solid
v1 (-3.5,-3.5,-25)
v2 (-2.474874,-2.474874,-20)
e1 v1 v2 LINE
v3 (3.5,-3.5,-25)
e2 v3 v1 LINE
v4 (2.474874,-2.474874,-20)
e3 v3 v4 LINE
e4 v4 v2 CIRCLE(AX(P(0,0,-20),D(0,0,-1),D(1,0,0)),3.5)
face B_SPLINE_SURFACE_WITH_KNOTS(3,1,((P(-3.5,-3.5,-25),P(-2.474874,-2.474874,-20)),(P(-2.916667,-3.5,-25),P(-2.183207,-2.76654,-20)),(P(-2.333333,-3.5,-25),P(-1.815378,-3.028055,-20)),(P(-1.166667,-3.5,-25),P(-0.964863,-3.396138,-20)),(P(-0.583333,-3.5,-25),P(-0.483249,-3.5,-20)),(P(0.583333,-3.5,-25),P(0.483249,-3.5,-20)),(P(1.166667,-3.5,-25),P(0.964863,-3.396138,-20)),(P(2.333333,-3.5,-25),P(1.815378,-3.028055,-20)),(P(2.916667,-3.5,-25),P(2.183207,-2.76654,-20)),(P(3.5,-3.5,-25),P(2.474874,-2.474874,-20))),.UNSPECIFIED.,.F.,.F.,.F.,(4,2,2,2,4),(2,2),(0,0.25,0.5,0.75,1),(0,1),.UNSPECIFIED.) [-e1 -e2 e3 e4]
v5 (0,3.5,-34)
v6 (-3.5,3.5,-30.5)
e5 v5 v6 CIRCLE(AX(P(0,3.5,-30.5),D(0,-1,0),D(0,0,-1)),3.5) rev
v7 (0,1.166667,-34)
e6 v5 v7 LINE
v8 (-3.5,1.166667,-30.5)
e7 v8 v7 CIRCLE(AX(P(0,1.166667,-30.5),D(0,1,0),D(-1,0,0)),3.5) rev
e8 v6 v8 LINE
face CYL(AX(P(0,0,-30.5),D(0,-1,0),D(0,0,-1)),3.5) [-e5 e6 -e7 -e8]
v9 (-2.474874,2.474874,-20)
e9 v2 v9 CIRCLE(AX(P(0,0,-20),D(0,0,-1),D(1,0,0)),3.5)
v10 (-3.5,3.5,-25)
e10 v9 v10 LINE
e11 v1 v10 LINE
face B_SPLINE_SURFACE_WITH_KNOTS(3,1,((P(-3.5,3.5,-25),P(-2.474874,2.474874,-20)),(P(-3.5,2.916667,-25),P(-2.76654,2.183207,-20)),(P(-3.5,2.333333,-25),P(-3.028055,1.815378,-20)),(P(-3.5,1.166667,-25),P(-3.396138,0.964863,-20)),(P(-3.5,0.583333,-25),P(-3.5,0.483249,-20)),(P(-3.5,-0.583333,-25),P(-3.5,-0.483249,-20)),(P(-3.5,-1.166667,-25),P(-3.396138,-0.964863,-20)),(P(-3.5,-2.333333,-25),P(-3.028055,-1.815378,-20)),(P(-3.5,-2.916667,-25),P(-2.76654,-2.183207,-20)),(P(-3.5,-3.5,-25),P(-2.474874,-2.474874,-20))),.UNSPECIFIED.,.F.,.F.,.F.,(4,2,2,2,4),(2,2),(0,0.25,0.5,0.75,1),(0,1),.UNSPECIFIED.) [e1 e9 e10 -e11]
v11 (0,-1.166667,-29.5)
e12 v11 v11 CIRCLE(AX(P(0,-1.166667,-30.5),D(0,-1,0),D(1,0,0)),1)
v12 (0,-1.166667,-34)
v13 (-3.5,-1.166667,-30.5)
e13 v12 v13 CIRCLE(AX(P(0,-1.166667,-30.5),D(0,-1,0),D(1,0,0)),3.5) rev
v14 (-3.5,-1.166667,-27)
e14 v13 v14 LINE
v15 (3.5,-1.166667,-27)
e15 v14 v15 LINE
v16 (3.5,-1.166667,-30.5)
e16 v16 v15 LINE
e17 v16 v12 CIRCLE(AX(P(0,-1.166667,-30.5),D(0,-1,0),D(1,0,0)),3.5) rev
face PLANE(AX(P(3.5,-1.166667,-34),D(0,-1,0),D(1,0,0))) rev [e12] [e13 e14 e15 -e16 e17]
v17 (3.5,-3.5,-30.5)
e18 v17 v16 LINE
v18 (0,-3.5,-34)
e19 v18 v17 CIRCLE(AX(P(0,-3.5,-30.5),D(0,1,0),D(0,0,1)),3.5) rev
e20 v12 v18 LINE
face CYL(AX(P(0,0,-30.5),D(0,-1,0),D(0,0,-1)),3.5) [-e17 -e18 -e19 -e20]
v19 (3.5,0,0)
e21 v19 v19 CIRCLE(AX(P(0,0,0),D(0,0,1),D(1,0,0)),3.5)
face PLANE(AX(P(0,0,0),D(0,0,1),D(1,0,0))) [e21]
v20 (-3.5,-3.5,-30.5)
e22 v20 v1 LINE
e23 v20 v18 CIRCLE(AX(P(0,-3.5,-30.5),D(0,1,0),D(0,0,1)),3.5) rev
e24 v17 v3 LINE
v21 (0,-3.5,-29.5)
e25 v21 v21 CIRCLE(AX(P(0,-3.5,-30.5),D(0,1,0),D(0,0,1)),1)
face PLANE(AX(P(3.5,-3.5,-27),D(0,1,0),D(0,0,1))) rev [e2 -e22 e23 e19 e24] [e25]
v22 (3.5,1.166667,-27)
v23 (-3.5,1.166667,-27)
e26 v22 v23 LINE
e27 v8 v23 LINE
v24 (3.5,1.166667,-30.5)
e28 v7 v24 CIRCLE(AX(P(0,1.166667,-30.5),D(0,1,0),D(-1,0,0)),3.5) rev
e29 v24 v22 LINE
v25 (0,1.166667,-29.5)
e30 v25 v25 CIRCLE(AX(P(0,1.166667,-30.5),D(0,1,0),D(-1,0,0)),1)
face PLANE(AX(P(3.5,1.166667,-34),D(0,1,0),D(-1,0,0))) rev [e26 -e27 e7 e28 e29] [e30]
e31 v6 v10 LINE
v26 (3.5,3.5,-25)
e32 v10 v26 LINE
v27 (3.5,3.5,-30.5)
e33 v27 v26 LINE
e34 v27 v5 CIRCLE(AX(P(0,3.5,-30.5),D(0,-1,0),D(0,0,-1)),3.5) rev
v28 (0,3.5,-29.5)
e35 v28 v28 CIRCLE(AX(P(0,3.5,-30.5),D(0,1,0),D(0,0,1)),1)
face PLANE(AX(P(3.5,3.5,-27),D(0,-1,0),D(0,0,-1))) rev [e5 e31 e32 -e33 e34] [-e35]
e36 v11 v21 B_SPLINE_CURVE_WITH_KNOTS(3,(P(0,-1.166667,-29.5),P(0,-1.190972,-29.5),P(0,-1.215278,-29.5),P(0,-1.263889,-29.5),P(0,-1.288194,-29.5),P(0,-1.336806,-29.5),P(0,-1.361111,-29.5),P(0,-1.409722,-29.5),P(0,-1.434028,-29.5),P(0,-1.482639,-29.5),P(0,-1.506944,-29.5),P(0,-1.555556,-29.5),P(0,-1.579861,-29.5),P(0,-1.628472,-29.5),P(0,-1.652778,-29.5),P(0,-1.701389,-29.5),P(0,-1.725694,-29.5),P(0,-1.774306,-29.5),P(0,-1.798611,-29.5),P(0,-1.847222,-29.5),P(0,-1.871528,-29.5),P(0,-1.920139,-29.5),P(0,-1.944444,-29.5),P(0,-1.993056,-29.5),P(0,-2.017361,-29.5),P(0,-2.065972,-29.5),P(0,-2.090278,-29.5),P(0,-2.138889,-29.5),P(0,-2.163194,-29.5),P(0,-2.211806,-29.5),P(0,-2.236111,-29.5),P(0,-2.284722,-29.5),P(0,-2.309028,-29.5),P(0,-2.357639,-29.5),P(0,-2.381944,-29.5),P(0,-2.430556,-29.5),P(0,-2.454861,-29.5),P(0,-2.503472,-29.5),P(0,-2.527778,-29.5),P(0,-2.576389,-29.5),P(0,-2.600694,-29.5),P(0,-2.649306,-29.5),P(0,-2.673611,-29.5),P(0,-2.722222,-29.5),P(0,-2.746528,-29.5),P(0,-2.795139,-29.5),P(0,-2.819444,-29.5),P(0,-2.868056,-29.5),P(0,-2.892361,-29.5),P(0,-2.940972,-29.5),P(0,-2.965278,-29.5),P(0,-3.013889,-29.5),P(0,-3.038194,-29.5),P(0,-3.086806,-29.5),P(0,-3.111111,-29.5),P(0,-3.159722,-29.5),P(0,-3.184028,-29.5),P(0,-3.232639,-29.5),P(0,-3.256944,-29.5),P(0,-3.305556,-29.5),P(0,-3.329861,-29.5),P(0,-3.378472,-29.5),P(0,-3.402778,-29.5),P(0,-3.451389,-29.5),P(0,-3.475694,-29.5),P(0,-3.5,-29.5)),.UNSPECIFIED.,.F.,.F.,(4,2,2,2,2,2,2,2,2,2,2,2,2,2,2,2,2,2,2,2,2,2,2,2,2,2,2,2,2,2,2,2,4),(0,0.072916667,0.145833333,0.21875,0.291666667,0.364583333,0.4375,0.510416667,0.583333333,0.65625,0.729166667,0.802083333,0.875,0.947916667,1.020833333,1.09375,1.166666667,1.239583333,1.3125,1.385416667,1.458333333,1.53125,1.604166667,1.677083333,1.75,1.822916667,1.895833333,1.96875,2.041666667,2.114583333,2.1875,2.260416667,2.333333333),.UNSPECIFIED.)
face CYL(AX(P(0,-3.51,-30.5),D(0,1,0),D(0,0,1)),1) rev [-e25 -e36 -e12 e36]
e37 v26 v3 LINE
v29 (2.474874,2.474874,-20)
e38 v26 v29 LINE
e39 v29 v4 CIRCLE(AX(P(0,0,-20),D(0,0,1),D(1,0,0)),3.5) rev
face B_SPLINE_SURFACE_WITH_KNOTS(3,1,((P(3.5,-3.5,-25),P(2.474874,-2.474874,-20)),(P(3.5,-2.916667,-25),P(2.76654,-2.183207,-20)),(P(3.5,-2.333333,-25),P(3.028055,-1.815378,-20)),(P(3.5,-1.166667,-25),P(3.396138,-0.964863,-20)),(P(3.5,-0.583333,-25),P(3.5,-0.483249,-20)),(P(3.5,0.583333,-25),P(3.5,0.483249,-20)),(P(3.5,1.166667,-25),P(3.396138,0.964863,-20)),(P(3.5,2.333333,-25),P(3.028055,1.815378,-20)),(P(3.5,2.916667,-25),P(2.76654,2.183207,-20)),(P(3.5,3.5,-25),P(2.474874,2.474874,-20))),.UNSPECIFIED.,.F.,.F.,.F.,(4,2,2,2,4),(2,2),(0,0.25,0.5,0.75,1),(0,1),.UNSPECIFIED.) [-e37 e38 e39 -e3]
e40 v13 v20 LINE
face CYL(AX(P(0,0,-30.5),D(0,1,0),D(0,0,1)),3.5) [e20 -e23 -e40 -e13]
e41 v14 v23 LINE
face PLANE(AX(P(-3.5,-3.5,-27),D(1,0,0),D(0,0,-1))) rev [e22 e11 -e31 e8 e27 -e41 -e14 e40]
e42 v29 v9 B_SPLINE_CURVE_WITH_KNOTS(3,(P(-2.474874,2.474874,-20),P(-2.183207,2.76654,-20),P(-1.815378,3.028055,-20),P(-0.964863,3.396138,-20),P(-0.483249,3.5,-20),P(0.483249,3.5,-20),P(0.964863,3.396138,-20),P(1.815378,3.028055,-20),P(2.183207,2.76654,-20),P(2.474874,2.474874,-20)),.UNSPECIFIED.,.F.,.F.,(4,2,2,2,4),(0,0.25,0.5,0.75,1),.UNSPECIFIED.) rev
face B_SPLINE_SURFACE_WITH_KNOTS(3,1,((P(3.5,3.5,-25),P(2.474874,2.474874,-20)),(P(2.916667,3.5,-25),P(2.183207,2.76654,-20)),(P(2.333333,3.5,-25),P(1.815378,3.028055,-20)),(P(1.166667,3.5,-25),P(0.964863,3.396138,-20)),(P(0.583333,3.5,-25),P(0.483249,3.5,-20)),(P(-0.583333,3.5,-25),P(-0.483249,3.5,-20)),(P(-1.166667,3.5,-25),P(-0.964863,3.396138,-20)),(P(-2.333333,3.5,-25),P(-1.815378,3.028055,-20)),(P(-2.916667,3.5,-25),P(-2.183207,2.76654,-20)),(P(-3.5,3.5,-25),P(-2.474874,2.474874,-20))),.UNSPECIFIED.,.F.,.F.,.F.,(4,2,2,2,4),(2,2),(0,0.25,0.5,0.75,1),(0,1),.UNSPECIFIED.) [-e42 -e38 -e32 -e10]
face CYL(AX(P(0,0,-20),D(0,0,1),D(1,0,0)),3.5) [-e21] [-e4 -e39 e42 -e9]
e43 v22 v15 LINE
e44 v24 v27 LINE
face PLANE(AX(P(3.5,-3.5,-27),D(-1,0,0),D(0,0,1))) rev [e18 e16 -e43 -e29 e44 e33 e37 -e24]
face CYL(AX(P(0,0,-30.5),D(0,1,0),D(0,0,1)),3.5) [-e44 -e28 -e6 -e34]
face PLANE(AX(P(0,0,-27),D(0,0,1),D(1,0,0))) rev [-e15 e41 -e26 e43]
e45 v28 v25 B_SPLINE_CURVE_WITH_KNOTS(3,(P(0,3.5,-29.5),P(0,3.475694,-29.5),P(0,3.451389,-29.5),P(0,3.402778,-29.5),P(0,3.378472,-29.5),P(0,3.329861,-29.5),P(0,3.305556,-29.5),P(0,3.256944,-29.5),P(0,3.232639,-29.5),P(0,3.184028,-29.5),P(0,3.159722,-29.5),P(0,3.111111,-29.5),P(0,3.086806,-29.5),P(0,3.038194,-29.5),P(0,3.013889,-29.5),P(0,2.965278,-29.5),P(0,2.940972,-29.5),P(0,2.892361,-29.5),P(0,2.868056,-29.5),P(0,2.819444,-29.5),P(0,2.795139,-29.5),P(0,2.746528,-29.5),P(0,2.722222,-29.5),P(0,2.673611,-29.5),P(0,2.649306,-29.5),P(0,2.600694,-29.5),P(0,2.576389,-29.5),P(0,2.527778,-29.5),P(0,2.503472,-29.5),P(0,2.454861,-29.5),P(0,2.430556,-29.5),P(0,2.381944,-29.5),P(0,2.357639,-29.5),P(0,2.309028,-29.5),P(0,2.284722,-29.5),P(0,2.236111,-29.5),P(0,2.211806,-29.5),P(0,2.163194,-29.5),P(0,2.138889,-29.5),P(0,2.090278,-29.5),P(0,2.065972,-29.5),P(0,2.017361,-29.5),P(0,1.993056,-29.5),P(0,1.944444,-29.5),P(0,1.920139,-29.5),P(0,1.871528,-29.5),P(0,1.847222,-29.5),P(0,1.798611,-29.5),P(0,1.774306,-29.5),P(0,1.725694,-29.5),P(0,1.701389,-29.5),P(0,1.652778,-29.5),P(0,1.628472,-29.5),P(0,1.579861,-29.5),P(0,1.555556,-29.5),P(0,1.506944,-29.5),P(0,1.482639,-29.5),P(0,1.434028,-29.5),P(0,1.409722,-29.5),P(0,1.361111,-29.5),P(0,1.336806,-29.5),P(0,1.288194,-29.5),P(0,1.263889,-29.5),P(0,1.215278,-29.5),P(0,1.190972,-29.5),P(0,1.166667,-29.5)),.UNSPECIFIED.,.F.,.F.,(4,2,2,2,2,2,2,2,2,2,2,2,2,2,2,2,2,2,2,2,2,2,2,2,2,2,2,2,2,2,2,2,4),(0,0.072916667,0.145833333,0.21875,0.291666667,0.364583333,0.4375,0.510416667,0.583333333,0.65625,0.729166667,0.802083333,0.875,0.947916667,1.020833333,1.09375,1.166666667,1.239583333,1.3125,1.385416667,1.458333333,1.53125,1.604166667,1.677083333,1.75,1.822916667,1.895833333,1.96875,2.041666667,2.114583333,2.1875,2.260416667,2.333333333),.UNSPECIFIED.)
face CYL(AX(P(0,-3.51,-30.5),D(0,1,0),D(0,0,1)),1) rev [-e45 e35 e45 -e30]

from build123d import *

# Parameters (mm, degrees)
SKETCH1_R           = 3.5
BOSS_EXTRUDE1_DEPTH = 20
SKETCH3_2_W         = 7
SKETCH3_2_H         = 7
BOSS_EXTRUDE3_DEPTH = 2
SKETCH4_W           = 7
SKETCH4_H           = 2.333333333
BOSS_EXTRUDE2_DEPTH = 7
SKETCH5_R           = 1
CUT_EXTRUDE1_DEPTH  = 35.889110176
FILLET1_R           = 3.5


with BuildPart() as part:
    # Sketch1 → Boss-Extrude1 (new body)
    with BuildSketch(Plane.XY):
        Circle(SKETCH1_R)
    extrude(amount=-BOSS_EXTRUDE1_DEPTH)

    # Loft1: read off the stored shape, not the designer's step
    # Loft1: loft between two sections, ruled curve by curve
    loft1_from = [
        Edge.make_bspline([(-3.5, 3.5, -25), (-3.5, 2.916666667, -25), (-3.5, 2.333333333, -25), (-3.5, 1.166666667, -25), (-3.5, 0.583333333, -25), (-3.5, -0.583333333, -25), (-3.5, -1.166666667, -25), (-3.5, -2.333333333, -25), (-3.5, -2.916666667, -25), (-3.5, -3.5, -25)], [0, 0, 0, 0, 0.25, 0.25, 0.5, 0.5, 0.75, 0.75, 1, 1, 1, 1], 3),
        Edge.make_bspline([(-3.5, -3.5, -25), (-2.916666667, -3.5, -25), (-2.333333333, -3.5, -25), (-1.166666667, -3.5, -25), (-0.583333333, -3.5, -25), (0.583333333, -3.5, -25), (1.166666667, -3.5, -25), (2.333333333, -3.5, -25), (2.916666667, -3.5, -25), (3.5, -3.5, -25)], [0, 0, 0, 0, 0.25, 0.25, 0.5, 0.5, 0.75, 0.75, 1, 1, 1, 1], 3),
        Edge.make_bspline([(3.5, 3.5, -25), (2.916666667, 3.5, -25), (2.333333333, 3.5, -25), (1.166666667, 3.5, -25), (0.583333333, 3.5, -25), (-0.583333333, 3.5, -25), (-1.166666667, 3.5, -25), (-2.333333333, 3.5, -25), (-2.916666667, 3.5, -25), (-3.5, 3.5, -25)], [0, 0, 0, 0, 0.25, 0.25, 0.5, 0.5, 0.75, 0.75, 1, 1, 1, 1], 3),
        Edge.make_bspline([(3.5, -3.5, -25), (3.5, -2.916666667, -25), (3.5, -2.333333333, -25), (3.5, -1.166666667, -25), (3.5, -0.583333333, -25), (3.5, 0.583333333, -25), (3.5, 1.166666667, -25), (3.5, 2.333333333, -25), (3.5, 2.916666667, -25), (3.5, 3.5, -25)], [0, 0, 0, 0, 0.25, 0.25, 0.5, 0.5, 0.75, 0.75, 1, 1, 1, 1], 3),
    ]
    loft1_to = [
        Edge.make_bspline([(-2.474873734, 2.474873734, -20), (-2.766540401, 2.183207067, -20), (-3.028055087, 1.815378049, -20), (-3.396138059, 0.964863384, -20), (-3.5, 0.483249156, -20), (-3.5, -0.483249156, -20), (-3.396138059, -0.964863384, -20), (-3.028055087, -1.815378049, -20), (-2.766540401, -2.183207067, -20), (-2.474873734, -2.474873734, -20)], [0, 0, 0, 0, 0.25, 0.25, 0.5, 0.5, 0.75, 0.75, 1, 1, 1, 1], 3),
        Edge.make_bspline([(-2.474873734, -2.474873734, -20), (-2.183207067, -2.766540401, -20), (-1.815378049, -3.028055087, -20), (-0.964863384, -3.396138059, -20), (-0.483249156, -3.5, -20), (0.483249156, -3.5, -20), (0.964863384, -3.396138059, -20), (1.815378049, -3.028055087, -20), (2.183207067, -2.766540401, -20), (2.474873734, -2.474873734, -20)], [0, 0, 0, 0, 0.25, 0.25, 0.5, 0.5, 0.75, 0.75, 1, 1, 1, 1], 3),
        Edge.make_bspline([(2.474873734, 2.474873734, -20), (2.183207067, 2.766540401, -20), (1.815378049, 3.028055087, -20), (0.964863384, 3.396138059, -20), (0.483249156, 3.5, -20), (-0.483249156, 3.5, -20), (-0.964863384, 3.396138059, -20), (-1.815378049, 3.028055087, -20), (-2.183207067, 2.766540401, -20), (-2.474873734, 2.474873734, -20)], [0, 0, 0, 0, 0.25, 0.25, 0.5, 0.5, 0.75, 0.75, 1, 1, 1, 1], 3),
        Edge.make_bspline([(2.474873734, -2.474873734, -20), (2.766540401, -2.183207067, -20), (3.028055087, -1.815378049, -20), (3.396138059, -0.964863384, -20), (3.5, -0.483249156, -20), (3.5, 0.483249156, -20), (3.396138059, 0.964863384, -20), (3.028055087, 1.815378049, -20), (2.766540401, 2.183207067, -20), (2.474873734, 2.474873734, -20)], [0, 0, 0, 0, 0.25, 0.25, 0.5, 0.5, 0.75, 0.75, 1, 1, 1, 1], 3),
    ]
    loft1 = Solid(Shell([*[Face.make_surface_from_curves(loft1_from[k], loft1_to[k]) for k in range(4)], Face(Wire(loft1_from)), Face(Wire(loft1_to))]))
    add(loft1)

    # Sketch3<2> → Boss-Extrude3 (add)
    with BuildSketch(Plane(origin=(0, 0, -25), x_dir=(-1, 0, 0), z_dir=(0, 0, -1))):
        Rectangle(SKETCH3_2_W, SKETCH3_2_H)
    extrude(amount=BOSS_EXTRUDE3_DEPTH)

    # Sketch4 → Boss-Extrude2 (add)
    with BuildSketch(Plane(origin=(0, 0, -27), x_dir=(-1, 0, 0), z_dir=(0, 0, -1))):
        with Locations((0, 2.333333334)):
            Rectangle(SKETCH4_W, SKETCH4_H)
        with Locations((0, -2.333333334)):
            Rectangle(SKETCH4_W, SKETCH4_H)
    extrude(amount=BOSS_EXTRUDE2_DEPTH)

    # Sketch5 → Cut-Extrude1 (cut, through all)
    with BuildSketch(Plane(origin=(0, 3.5, 0), x_dir=(1, 0, 0), z_dir=(0, 1, 0))):
        with Locations(Location((0, 30.5, 0), (0, 0, 270))):
            Circle(SKETCH5_R)
    extrude(amount=-CUT_EXTRUDE1_DEPTH, mode=Mode.SUBTRACT)

    # Fillet1
    fillet1_edges = [part.edges().sort_by_distance(p)[0] for p in [
        (-3.5, 2.333333333, -34),
        (-3.5, -2.333333333, -34),
        (3.5, -2.333333333, -34),
        (3.5, 2.333333333, -34),
    ]]
    fillet(fillet1_edges, radius=FILLET1_R - 0.0001)  # a hair under: the kernel refuses the full size


solid = part.part
